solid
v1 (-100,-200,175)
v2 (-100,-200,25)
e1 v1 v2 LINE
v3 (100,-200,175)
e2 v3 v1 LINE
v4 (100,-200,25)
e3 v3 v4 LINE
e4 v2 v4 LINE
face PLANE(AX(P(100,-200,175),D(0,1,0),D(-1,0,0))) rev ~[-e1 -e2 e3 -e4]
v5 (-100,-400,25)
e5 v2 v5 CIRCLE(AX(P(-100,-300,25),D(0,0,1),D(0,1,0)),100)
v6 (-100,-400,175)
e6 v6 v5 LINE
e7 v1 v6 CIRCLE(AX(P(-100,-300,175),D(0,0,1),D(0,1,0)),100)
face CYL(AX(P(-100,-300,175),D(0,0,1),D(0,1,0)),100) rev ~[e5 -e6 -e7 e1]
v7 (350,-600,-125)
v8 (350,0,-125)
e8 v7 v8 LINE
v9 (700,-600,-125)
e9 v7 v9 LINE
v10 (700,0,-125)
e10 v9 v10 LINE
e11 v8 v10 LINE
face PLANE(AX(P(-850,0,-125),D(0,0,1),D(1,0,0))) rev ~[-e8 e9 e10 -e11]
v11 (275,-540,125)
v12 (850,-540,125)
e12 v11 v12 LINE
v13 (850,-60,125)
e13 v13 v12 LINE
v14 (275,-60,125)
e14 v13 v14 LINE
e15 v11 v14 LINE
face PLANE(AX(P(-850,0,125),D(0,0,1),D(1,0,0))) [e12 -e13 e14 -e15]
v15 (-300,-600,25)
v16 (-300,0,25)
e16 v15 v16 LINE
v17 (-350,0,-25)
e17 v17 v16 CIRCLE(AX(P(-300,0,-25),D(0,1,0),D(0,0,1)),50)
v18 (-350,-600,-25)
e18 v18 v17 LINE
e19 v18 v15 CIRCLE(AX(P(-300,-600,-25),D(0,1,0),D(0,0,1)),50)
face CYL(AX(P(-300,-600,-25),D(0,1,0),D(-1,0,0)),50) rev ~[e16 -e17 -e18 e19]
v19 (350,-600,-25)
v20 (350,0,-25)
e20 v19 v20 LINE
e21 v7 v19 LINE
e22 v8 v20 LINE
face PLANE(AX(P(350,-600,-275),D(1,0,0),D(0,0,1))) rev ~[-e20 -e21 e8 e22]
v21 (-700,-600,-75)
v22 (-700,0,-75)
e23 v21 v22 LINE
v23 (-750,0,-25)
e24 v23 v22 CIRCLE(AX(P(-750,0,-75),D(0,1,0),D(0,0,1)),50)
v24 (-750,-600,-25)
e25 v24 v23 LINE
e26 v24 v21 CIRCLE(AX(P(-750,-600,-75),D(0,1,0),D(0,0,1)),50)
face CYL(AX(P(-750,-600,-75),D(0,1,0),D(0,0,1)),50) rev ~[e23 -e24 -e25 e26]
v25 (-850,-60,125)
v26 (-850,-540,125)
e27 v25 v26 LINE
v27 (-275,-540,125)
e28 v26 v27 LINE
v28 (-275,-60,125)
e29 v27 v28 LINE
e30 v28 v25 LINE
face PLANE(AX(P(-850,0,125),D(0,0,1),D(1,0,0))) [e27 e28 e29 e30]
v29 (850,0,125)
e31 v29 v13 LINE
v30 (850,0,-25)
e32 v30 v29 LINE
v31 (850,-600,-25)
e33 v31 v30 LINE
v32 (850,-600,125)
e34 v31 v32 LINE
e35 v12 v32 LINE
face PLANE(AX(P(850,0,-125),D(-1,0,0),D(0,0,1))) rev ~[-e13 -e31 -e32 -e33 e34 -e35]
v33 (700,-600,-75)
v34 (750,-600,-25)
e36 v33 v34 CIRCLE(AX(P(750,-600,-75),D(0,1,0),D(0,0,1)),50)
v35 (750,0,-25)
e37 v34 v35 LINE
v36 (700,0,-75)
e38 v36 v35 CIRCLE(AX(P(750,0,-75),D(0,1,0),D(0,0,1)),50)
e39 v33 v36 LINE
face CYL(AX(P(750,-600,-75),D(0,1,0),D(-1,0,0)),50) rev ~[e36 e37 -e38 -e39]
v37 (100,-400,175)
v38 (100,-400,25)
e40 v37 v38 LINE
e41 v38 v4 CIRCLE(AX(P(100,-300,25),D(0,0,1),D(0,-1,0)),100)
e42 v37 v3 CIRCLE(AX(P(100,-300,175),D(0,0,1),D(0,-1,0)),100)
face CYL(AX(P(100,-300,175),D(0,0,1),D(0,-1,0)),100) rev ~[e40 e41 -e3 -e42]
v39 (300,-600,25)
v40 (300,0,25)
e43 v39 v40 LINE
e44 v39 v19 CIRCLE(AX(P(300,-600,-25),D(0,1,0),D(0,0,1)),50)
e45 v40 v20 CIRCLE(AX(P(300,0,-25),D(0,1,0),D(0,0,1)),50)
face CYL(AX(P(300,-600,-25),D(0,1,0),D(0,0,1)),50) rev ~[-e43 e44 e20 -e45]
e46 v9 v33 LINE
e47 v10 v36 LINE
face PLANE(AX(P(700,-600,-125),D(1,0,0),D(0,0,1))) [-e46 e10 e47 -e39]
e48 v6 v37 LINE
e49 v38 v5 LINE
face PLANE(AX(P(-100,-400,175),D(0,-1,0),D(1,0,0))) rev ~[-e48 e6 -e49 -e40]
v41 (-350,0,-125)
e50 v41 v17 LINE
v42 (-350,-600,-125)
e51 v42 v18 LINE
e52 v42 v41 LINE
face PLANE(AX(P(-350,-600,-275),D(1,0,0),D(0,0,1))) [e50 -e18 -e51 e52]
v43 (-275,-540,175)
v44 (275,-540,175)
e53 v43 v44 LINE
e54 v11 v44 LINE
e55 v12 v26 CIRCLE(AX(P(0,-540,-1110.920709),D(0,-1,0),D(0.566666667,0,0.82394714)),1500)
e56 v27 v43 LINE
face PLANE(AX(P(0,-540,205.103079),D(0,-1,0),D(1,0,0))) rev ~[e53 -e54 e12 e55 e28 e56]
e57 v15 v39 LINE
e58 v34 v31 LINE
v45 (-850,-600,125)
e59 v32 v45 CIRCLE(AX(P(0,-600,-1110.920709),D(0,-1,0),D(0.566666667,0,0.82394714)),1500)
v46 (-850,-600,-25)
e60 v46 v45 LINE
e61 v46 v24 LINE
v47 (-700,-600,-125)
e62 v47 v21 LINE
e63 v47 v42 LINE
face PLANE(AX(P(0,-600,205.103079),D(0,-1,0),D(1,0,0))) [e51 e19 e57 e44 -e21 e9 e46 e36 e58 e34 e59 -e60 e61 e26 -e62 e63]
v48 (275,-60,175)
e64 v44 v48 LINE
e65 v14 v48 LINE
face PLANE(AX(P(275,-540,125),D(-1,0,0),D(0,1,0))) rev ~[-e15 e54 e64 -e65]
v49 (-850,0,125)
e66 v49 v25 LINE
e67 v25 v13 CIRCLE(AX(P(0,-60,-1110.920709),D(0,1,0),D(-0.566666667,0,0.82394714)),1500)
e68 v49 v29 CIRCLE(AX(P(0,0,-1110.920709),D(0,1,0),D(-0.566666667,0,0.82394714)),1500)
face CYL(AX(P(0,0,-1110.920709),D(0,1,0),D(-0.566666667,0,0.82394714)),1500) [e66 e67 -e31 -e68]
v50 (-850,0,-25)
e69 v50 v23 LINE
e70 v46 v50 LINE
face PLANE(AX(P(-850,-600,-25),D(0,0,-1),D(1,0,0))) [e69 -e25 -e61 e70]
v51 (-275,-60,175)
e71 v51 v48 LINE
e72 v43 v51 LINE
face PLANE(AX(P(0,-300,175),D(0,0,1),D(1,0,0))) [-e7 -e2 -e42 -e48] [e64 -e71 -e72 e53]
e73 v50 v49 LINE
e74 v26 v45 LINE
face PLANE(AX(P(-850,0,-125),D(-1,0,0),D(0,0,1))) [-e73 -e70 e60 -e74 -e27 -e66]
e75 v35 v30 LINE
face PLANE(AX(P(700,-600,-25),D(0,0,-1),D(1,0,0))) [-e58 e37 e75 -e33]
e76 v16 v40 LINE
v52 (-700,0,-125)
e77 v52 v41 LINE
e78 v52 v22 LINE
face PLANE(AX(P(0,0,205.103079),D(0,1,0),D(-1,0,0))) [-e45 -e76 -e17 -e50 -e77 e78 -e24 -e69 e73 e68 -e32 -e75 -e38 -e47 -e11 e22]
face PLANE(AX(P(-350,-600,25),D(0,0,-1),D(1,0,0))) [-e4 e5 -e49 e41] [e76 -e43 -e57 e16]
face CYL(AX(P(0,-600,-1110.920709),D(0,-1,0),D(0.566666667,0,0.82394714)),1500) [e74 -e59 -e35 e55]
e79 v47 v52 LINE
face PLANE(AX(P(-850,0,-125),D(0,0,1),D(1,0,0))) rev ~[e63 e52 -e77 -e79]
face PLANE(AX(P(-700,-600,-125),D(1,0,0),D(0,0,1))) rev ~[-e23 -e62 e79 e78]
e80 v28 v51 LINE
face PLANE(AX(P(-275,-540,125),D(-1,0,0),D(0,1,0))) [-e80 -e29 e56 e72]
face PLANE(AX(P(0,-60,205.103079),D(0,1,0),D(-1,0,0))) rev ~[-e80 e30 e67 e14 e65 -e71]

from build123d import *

# Parameters (mm, degrees)
F0_W      = 1700
F0_H      = 250
F1_DEPTH  = 600
F2_W      = 700
F2_H      = 300
F3_DEPTH  = 600.001
F4_W      = 150
F4_H      = 100
F5_DEPTH  = 600.001
F6_W      = 150
F6_H      = 100
F7_DEPTH  = 600.001
F9_DEPTH  = 60
F11_DEPTH = 60
F12_W     = 550
F12_H     = 480
F13_DEPTH = 50
F15_DEPTH = 300.001
F16_R     = 50
F17_R     = 50
F18_R     = 50
F19_R     = 50
F20_DEPTH = 300.001


# Not quite as in the source:
# - a feature names something its author has since deleted; it is built from what else it names


with BuildPart() as f1:
    # F0 (on Front) → F1 (new body)
    with BuildSketch(Plane.XZ):
        Rectangle(F0_W, F0_H)
    extrude(amount=F1_DEPTH)

    # F2 (on face) → F3 (cut, through all)
    with BuildSketch(Plane.XZ.offset(600)):
        with Locations((0, -125)):
            Rectangle(F2_W, F2_H)
    extrude(amount=-F3_DEPTH, mode=Mode.SUBTRACT)

    # F4 (on face) → F5 (cut, through all)
    with BuildSketch(Plane.XZ.offset(600)):
        with Locations((-775, -75)):
            Rectangle(F4_W, F4_H)
    extrude(amount=-F5_DEPTH, mode=Mode.SUBTRACT)

    # F6 (on face) → F7 (cut, through all)
    with BuildSketch(Plane.XZ.offset(600)):
        with Locations((775, -75)):
            Rectangle(F6_W, F6_H)
    extrude(amount=-F7_DEPTH, mode=Mode.SUBTRACT)

    # F8 (on face) → F9 (join)
    with BuildSketch(Plane.XZ.offset(600)):
        with BuildLine():
            Line((-850, 125), (850, 125))
            ThreePointArc((850, 125), (0, 389.0792905692), (-850, 125))
        make_face()
    extrude(amount=-F9_DEPTH)

    # F10 (on face) → F11 (join)
    with BuildSketch(Plane(origin=(0, 0, 0), x_dir=(-1, 0, 0), z_dir=(0, 1, 0))):
        with BuildLine():
            Line((-850, 125), (850, 125))
            ThreePointArc((850, 125), (0, 389.0792905692), (-850, 125))
        make_face()
    extrude(amount=-F11_DEPTH)

    # F12 (on face) → F13 (join)
    with BuildSketch(Plane.XY.offset(125)):
        with Locations((0, -300)):
            Rectangle(F12_W, F12_H)
    extrude(amount=F13_DEPTH)

    # F14 (on face) → F15 (cut, through all)
    with BuildSketch(Plane.XY.offset(175)):
        with BuildLine():
            ThreePointArc((-100, -200), (-200, -300), (-100, -400))
            Line((-100, -400), (100, -400))
            ThreePointArc((100, -400), (200, -300), (100, -200))
            Line((100, -200), (-100, -200))
        make_face()
    extrude(amount=-F15_DEPTH, mode=Mode.SUBTRACT)

    # F16
    f16_edges = [f1.edges().sort_by_distance(p)[0] for p in [
        (-700, -300, -25),
    ]]
    fillet(f16_edges, radius=F16_R)

    # F17
    f17_edges = [f1.edges().sort_by_distance(p)[0] for p in [
        (-350, -300, 25),
    ]]
    fillet(f17_edges, radius=F17_R)

    # F18
    f18_edges = [f1.edges().sort_by_distance(p)[0] for p in [
        (350, -300, 25),
    ]]
    fillet(f18_edges, radius=F18_R)

    # F19
    f19_edges = [f1.edges().sort_by_distance(p)[0] for p in [
        (700, -300, -25),
    ]]
    fillet(f19_edges, radius=F19_R)

    # F14 (on face) → F20 (cut, through all)
    with BuildSketch(Plane.XY.offset(175)):
        with BuildLine():
            ThreePointArc((-100, -200), (-200, -300), (-100, -400))
            Line((-100, -400), (100, -400))
            ThreePointArc((100, -400), (200, -300), (100, -200))
            Line((100, -200), (-100, -200))
        make_face()
    extrude(amount=-F20_DEPTH, mode=Mode.SUBTRACT)


solid = f1.part
